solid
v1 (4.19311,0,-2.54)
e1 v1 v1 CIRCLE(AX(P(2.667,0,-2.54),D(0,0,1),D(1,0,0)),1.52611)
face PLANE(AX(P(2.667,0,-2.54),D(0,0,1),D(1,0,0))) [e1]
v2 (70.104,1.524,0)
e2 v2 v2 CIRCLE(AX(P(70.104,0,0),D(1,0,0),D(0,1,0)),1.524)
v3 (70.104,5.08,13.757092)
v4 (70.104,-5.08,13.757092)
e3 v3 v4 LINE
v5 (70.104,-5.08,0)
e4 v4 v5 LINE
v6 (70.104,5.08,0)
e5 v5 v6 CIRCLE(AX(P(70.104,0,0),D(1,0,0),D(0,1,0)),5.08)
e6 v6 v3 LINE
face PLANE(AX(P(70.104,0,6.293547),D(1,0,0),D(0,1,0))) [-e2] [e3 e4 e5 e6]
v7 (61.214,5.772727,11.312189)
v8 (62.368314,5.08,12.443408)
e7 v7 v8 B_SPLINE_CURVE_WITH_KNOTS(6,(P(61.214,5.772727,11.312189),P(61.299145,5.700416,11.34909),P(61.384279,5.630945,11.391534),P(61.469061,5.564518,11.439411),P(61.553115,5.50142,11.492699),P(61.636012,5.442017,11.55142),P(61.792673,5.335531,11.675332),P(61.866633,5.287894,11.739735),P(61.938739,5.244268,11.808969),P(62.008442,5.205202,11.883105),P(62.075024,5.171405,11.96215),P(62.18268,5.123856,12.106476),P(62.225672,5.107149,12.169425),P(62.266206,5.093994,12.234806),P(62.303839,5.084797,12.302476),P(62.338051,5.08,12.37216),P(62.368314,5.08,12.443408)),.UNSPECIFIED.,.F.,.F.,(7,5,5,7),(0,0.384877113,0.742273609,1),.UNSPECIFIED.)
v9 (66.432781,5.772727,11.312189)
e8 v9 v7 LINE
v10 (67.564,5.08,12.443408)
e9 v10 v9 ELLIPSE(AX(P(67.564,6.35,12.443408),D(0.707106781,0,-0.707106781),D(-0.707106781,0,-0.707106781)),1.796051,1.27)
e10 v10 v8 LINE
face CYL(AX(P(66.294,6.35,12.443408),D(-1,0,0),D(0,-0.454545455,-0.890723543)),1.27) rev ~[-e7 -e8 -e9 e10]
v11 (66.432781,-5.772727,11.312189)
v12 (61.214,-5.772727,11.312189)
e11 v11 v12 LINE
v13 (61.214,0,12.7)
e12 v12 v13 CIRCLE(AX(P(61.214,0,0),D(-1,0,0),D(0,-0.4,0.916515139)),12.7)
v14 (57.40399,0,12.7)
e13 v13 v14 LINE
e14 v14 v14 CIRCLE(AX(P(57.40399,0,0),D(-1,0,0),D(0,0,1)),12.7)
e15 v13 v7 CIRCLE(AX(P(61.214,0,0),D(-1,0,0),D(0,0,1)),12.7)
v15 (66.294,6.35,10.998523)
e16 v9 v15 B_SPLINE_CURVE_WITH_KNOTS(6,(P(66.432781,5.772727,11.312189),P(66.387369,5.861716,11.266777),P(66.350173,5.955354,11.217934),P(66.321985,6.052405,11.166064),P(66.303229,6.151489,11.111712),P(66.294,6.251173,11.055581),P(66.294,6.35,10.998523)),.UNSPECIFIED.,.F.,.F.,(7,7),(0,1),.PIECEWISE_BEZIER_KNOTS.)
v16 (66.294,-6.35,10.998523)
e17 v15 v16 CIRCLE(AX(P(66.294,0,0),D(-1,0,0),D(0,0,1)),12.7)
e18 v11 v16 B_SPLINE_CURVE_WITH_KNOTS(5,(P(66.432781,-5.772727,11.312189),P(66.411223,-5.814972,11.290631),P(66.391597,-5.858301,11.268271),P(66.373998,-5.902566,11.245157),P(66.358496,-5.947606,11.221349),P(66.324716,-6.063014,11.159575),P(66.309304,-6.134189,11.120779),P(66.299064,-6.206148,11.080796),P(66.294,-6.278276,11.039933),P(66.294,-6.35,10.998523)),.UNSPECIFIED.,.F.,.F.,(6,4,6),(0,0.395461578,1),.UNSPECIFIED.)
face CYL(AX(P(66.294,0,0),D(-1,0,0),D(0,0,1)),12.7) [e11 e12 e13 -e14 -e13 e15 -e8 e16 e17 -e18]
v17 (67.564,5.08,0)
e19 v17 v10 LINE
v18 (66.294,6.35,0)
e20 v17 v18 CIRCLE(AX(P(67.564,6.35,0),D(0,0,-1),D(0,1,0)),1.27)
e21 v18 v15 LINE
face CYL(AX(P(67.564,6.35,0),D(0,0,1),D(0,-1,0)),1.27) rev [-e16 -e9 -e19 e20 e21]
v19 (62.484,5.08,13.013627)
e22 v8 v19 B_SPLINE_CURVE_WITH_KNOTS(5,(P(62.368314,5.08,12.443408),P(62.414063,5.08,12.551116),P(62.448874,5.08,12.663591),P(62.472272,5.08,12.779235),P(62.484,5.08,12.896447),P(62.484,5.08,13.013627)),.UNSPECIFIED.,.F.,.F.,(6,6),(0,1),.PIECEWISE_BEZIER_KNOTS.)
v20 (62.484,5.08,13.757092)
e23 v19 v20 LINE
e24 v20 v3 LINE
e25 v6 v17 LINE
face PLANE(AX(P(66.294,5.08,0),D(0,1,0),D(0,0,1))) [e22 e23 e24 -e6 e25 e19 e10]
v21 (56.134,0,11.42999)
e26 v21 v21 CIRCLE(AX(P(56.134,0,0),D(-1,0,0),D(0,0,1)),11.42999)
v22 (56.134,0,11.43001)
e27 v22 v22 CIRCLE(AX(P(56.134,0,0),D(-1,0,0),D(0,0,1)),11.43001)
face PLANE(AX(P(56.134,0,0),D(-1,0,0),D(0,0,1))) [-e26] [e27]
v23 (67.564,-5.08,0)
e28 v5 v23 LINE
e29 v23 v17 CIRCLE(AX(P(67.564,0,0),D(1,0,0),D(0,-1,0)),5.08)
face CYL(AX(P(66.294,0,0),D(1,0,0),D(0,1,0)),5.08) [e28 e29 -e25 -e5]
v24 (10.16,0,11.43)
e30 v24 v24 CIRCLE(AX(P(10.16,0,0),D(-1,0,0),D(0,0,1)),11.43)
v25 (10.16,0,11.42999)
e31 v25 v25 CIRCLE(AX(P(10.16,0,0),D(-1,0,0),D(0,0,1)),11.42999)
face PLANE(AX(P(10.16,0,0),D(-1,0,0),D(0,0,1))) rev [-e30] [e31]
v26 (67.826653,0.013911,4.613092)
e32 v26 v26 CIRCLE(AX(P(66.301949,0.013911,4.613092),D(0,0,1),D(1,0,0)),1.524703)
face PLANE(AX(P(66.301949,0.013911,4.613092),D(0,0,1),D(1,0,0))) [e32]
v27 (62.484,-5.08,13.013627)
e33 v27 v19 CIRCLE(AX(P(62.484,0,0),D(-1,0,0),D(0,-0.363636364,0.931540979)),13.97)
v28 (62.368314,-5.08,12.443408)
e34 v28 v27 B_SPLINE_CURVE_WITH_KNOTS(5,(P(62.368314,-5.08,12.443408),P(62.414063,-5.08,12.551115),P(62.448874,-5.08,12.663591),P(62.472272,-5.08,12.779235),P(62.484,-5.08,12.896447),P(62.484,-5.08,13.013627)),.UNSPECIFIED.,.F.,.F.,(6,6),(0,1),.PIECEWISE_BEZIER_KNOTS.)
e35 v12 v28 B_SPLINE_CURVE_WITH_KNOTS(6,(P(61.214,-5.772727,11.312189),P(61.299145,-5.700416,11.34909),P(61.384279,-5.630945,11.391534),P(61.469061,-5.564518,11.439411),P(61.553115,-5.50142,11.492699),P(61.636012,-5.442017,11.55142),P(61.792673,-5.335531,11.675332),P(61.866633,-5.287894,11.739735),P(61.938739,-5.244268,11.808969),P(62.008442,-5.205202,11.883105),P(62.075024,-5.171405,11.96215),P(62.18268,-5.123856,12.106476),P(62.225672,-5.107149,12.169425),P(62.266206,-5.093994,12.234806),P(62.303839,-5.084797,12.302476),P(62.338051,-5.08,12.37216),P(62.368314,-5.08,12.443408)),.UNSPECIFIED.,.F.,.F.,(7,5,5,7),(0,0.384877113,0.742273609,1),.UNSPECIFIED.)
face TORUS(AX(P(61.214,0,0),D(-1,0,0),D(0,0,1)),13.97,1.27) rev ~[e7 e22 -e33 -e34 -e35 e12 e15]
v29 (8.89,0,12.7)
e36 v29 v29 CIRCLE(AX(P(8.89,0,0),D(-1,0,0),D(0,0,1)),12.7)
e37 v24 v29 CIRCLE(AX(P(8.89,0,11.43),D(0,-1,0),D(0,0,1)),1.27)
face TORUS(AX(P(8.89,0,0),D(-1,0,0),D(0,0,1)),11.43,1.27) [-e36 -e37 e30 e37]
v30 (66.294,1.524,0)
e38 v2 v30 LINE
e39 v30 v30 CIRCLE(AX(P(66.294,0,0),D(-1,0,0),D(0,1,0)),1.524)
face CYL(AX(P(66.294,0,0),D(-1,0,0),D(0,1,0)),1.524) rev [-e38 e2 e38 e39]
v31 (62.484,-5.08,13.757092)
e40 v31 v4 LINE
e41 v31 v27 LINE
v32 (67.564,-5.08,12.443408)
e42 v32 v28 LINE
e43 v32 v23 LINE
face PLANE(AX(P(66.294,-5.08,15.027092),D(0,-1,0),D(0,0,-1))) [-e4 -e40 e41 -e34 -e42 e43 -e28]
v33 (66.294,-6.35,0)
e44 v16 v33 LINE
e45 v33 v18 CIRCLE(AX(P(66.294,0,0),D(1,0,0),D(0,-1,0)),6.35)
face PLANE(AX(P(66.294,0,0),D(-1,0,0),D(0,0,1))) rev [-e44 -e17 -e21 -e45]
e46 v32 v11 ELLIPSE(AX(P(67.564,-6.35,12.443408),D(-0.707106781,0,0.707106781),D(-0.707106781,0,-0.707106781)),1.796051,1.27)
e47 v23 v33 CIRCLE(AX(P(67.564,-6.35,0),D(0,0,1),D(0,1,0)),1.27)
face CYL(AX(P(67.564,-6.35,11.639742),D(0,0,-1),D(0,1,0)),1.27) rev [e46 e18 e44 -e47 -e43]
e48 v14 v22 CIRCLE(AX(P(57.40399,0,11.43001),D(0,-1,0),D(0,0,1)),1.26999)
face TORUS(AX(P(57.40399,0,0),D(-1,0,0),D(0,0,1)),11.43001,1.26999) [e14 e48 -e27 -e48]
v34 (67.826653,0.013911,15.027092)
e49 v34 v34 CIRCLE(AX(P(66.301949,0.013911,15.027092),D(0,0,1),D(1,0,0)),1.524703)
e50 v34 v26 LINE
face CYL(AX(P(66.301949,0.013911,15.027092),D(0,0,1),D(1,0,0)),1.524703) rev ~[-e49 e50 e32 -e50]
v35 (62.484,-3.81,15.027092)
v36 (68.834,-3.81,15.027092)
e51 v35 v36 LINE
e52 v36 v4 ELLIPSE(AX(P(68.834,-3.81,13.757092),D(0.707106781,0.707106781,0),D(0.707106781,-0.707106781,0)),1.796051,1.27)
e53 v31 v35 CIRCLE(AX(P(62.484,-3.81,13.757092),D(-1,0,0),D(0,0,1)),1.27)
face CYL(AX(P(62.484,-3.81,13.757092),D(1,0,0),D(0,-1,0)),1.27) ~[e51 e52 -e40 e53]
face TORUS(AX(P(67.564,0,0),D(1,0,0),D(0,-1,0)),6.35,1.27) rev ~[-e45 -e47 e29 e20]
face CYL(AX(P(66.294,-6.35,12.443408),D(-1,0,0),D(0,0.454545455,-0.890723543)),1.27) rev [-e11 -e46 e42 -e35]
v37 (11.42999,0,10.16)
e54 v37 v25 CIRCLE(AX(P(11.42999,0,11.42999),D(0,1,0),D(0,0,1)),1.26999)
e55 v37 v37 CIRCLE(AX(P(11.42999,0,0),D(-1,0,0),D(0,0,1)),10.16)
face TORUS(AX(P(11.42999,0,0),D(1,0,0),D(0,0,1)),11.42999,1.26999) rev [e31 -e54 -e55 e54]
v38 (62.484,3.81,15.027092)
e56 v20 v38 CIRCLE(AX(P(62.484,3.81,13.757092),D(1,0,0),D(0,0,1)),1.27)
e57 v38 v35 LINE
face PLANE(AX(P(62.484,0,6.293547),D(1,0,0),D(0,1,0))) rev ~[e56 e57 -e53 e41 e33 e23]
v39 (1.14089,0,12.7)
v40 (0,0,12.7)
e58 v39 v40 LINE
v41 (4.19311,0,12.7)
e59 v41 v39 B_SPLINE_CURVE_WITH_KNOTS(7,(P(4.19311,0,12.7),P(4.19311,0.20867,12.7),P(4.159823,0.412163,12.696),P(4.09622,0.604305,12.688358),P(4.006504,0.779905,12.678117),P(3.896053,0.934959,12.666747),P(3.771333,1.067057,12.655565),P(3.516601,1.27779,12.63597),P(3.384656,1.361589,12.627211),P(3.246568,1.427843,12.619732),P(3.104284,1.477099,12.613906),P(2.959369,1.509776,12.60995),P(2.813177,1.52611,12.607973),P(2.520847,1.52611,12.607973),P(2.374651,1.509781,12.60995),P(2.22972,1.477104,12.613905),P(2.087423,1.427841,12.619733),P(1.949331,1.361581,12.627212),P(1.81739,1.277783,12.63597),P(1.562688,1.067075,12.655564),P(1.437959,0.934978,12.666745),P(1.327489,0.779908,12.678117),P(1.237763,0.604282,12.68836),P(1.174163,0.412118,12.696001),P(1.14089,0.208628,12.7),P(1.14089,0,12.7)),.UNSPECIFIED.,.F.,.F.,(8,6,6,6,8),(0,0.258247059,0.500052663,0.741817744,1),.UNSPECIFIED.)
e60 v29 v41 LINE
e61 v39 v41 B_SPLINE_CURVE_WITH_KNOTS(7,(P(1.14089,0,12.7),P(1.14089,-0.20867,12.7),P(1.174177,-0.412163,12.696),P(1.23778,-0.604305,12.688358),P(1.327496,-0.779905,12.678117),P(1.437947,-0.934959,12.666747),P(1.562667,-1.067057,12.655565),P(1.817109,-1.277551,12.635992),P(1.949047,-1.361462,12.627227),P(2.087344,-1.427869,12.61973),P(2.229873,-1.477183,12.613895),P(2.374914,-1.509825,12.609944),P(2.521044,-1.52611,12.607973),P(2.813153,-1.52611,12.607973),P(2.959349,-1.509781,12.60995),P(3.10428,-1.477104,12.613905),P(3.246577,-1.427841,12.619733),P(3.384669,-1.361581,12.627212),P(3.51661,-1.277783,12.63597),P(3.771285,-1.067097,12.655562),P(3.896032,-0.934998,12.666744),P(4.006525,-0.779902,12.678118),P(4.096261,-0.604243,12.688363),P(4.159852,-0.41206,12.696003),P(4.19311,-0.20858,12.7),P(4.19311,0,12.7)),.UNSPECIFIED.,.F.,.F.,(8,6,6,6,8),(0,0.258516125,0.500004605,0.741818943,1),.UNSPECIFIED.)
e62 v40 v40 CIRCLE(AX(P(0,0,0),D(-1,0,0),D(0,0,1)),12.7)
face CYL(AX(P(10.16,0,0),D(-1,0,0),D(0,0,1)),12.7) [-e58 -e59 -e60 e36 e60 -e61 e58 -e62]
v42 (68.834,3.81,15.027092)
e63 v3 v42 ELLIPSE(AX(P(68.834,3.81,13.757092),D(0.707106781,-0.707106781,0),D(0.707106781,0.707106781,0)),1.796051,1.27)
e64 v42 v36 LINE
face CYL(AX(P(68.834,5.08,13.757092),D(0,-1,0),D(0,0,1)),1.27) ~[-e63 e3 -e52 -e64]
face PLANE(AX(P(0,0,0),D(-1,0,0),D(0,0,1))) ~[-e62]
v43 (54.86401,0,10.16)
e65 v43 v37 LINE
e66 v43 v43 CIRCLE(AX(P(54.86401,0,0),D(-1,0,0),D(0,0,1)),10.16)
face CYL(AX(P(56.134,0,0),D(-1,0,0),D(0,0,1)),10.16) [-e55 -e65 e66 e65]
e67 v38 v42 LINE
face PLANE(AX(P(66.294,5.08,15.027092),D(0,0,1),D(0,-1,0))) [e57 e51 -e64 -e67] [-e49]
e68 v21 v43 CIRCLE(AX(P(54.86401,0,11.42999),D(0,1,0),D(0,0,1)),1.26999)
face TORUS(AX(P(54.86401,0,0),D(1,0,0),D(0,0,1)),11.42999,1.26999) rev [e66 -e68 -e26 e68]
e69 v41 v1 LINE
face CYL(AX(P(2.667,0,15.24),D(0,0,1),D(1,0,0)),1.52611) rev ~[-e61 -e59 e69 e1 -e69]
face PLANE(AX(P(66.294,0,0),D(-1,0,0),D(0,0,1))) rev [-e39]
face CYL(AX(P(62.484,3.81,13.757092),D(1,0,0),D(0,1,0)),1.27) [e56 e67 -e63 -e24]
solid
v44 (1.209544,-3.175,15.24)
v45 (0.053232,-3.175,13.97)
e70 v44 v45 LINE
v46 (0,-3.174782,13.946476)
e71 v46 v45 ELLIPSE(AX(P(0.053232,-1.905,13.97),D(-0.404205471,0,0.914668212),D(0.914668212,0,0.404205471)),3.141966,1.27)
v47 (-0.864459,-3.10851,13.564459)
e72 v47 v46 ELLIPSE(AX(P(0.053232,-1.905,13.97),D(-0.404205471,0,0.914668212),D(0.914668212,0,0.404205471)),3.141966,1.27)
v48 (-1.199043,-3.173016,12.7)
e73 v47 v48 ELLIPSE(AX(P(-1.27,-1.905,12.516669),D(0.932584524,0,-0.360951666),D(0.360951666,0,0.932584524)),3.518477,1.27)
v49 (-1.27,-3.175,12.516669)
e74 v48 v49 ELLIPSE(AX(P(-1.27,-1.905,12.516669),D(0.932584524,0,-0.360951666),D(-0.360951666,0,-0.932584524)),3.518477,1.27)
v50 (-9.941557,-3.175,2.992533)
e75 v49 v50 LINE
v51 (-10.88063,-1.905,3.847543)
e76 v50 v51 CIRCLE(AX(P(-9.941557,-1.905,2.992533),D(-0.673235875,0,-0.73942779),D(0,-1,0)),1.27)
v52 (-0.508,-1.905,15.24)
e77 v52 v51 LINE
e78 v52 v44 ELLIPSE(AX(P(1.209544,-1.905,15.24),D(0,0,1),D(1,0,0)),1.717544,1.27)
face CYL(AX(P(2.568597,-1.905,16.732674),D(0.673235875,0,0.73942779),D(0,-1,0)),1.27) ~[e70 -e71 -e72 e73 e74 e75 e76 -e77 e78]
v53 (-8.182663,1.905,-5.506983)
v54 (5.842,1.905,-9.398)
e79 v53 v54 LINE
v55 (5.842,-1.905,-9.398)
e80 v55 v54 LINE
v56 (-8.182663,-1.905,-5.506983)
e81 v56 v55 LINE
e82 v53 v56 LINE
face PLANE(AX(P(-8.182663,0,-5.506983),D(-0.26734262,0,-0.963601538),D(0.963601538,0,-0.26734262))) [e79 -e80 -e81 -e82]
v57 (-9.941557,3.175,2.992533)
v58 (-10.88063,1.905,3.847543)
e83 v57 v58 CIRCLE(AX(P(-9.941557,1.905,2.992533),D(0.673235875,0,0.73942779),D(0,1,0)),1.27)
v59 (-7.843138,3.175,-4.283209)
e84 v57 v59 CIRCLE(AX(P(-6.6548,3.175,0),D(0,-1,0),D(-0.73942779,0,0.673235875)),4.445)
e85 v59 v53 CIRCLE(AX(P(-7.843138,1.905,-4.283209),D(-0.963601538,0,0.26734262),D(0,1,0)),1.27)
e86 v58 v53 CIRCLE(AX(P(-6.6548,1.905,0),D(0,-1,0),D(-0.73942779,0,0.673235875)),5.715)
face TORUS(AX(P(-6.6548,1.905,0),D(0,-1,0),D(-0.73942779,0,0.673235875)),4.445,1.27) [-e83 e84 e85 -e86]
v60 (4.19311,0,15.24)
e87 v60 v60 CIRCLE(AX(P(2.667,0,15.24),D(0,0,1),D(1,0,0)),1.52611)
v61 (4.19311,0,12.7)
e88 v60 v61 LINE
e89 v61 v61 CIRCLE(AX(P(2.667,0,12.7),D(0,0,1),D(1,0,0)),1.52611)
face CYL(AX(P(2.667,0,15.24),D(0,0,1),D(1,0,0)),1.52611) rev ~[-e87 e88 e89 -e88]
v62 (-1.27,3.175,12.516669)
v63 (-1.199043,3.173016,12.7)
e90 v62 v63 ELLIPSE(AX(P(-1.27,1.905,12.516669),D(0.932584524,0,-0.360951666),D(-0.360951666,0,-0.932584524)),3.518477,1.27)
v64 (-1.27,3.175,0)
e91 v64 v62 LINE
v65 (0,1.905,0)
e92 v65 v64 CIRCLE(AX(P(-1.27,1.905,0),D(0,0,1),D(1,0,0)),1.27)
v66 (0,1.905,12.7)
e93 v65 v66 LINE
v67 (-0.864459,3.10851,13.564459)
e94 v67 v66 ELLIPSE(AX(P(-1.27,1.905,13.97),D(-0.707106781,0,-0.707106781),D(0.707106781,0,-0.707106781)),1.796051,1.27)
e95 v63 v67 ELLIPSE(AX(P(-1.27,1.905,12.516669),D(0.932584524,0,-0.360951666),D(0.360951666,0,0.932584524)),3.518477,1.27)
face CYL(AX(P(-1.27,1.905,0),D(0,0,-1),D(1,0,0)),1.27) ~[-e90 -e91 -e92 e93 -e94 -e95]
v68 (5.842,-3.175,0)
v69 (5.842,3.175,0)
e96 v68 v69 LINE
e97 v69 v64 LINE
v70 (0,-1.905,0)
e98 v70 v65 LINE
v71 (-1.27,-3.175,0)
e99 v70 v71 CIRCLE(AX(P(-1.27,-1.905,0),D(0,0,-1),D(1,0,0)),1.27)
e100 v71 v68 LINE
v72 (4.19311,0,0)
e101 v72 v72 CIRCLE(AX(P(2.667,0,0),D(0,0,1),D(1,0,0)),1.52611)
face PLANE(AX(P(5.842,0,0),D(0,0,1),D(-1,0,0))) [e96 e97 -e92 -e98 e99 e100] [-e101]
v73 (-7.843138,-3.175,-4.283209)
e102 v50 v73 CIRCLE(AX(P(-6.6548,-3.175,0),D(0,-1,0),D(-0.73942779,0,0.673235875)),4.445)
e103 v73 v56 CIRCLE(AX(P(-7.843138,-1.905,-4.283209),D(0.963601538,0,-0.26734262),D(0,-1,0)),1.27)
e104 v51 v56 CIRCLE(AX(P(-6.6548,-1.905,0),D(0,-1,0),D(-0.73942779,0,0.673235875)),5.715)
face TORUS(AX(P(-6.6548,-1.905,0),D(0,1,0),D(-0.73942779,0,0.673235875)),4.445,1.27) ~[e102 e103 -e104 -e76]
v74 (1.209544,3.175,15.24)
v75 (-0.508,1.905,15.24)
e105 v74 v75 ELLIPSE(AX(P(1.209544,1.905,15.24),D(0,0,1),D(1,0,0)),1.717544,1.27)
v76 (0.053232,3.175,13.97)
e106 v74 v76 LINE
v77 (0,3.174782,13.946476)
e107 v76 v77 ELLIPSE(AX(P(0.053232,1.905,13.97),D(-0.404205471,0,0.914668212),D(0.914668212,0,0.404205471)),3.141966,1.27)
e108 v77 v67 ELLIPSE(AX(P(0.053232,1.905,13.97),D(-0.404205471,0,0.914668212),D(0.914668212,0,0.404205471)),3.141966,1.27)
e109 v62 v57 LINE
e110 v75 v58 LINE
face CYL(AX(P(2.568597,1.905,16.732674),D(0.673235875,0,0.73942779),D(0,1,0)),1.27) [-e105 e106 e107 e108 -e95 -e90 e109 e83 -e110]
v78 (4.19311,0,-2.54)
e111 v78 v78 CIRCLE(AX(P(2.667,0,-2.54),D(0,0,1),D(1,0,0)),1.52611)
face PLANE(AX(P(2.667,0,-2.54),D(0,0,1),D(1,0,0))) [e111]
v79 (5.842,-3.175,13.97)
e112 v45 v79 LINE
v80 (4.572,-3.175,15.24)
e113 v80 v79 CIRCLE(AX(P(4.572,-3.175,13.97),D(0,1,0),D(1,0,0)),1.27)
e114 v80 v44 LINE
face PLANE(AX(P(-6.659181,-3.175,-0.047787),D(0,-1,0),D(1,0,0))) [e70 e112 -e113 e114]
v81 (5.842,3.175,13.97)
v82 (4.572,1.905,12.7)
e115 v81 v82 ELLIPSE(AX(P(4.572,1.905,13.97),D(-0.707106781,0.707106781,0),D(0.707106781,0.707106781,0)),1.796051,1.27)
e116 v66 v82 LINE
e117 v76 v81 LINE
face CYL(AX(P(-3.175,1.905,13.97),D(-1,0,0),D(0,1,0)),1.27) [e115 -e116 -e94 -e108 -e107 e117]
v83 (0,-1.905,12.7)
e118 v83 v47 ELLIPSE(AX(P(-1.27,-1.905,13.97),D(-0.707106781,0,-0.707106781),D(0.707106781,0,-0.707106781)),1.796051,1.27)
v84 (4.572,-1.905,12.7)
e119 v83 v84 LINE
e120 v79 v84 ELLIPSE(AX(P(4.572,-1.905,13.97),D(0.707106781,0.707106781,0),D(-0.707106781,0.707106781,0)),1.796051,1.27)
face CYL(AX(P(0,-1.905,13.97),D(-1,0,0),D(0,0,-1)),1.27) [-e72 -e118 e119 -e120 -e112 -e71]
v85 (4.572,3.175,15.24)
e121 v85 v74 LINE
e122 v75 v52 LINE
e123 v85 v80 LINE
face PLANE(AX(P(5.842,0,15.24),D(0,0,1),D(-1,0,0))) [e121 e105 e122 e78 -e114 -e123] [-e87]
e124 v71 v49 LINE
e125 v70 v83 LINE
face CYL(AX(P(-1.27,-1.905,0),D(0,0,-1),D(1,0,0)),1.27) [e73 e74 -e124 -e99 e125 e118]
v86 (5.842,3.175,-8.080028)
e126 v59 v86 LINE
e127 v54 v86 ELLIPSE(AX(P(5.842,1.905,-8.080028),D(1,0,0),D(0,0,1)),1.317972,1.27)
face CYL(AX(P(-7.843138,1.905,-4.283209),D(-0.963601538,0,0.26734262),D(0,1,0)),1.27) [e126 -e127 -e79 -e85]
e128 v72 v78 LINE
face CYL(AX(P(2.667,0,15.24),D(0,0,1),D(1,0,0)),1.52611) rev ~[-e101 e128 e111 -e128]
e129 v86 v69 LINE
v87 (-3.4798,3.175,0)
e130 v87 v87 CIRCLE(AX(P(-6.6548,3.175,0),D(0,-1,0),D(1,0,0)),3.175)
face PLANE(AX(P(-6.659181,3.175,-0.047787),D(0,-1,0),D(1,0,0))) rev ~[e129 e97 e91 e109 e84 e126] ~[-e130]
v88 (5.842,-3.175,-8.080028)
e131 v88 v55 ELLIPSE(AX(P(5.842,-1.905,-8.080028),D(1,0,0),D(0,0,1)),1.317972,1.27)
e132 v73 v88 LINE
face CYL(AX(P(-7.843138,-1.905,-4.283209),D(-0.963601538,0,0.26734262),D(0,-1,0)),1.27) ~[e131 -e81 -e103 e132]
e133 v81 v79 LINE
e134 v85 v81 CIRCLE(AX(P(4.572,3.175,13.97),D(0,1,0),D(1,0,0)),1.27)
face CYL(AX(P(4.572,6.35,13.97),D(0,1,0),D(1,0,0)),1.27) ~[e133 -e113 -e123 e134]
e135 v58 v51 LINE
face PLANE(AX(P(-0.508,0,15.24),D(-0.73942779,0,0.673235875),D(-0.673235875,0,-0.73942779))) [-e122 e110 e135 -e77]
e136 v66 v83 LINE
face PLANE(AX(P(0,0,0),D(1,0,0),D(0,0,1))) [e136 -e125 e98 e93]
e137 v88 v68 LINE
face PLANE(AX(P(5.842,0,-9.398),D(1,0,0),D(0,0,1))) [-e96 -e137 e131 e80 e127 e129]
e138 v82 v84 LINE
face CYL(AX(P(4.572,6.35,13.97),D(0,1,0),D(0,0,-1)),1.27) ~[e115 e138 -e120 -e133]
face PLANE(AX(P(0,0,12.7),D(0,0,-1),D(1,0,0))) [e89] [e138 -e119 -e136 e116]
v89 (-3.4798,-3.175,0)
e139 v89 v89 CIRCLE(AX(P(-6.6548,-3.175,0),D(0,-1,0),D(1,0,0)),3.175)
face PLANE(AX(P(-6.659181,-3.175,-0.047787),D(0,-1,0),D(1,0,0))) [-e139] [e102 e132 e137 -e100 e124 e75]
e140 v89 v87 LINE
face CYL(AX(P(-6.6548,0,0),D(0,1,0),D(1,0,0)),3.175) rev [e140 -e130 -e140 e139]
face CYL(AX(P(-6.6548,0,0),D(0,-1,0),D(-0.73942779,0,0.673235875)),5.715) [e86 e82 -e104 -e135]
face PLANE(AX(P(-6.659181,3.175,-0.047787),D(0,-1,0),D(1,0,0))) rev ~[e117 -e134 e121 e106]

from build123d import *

# Parameters (mm, degrees)
F0_R          = 3.175
F1_DEPTH      = 3.175
F0_W          = 5.842
F0_H          = 12.7
F3_R          = 1.524
F4_DEPTH      = 3.81
F5_R          = 1.5247034047
F6_DEPTH      = 10.414
F7_R          = 1.5261104457
F8_DEPTH      = 17.78
F9_R          = 1.26999
F10_R         = 1.27
F11_T1_DEPTH  = 12.7
F11_T3_DEPTH  = 18.5821257943
F11_T5_DEPTH  = 12.7
F11_T7_DEPTH  = 9.017
F11_T9_DEPTH  = 17.7294216388
F11_T12_ANGLE = 116.8111069241
F11_T14_ANGLE = 116.8111069241
F11_T19_DEPTH = 15.875
F11_T23_DEPTH = 12.192
F11_T30_DEPTH = 15.875
F11_T34_DEPTH = 12.192
F12_R         = 1.27


# Not quite as in the source:
# - a fillet or chamfer that OpenCascade refuses, or shapes differently, is made with other operations: its cross-section is extruded or revolved along the edge and cut away or added
# - a fillet or chamfer is up to 0.001 mm smaller than in the source, because OpenCascade refuses the exact size


with BuildPart() as f1:
    # F0 (on Front) → F1 (new body, symmetric)
    with BuildSketch(Plane.XZ):
        with BuildLine():
            ThreePointArc((-8.1826630726, -5.5069827884), (-3.1957909266, -4.5493385486), (-0.9398, 0))
            ThreePointArc((-0.9398, 0), (-4.5919612295, 5.3297205562), (-10.8806298187, 3.8475430269))
            ThreePointArc((-10.8806298187, 3.8475430269), (-12.1459778134, -1.5837270034), (-8.1826630726, -5.5069827884))
        make_face()
        with Locations((-6.6548, 0)):
            Circle(F0_R, mode=Mode.SUBTRACT)
        with BuildLine():
            Line((-0.9398, 0), (0, 0))
            Line((0, 0), (0, 12.7))
            Line((0, 12.7), (5.842, 12.7))
            Line((5.842, 12.7), (5.842, 15.24))
            Line((5.842, 15.24), (-0.508, 15.24))
            Line((-0.508, 15.24), (-10.8806298187, 3.8475430269))
            ThreePointArc((-10.8806298187, 3.8475430269), (-4.5919612295, 5.3297205562), (-0.9398, 0))
        make_face()
        with BuildLine():
            Line((5.842, 0), (0, 0))
            Line((0, 0), (-0.9398, 0))
            ThreePointArc((-0.9398, 0), (-3.1957909266, -4.5493385486), (-8.1826630726, -5.5069827884))
            Line((-8.1826630726, -5.5069827884), (5.842, -9.398))
            Line((5.842, -9.398), (5.842, 0))
        make_face()
    extrude(amount=F1_DEPTH, both=True)


with BuildPart() as f2:
    # F0 (on Front) → F2 (revolve)
    with BuildSketch(Plane.XZ):
        with Locations((2.921, 6.35)):
            Rectangle(F0_W, F0_H)
        Polygon((5.842, 12.7), (5.842, 0), (66.294, 0), (66.294, 12.7), (56.134, 12.7), (56.134, 10.16), (10.16, 10.16), (10.16, 12.7), align=None)
    revolve(axis=Axis((33.147, 0, 0), (-1, 0, 0)))

    # F3 (on face) → F4 (join, symmetric)
    with BuildSketch(Plane.YZ.offset(66.294)):
        with BuildLine():
            ThreePointArc((-5.08, 0), (0, 5.08), (5.08, 0))
            Line((5.08, 0), (5.08, 11.6397422652))
            ThreePointArc((5.08, 11.6397422652), (0, 12.7), (-5.08, 11.6397422652))
            Line((-5.08, 11.6397422652), (-5.08, 0))
        make_face()
        with BuildLine():
            ThreePointArc((-5.08, 0), (0, -5.08), (5.08, 0))
            ThreePointArc((5.08, 0), (0, 5.08), (-5.08, 0))
        make_face()
        Circle(F3_R, mode=Mode.SUBTRACT)
        with BuildLine():
            ThreePointArc((-5.08, 11.6397422652), (0, 12.7), (5.08, 11.6397422652))
            Line((5.08, 11.6397422652), (5.08, 15.0270918384))
            Line((5.08, 15.0270918384), (-5.08, 15.0270918384))
            Line((-5.08, 15.0270918384), (-5.08, 11.6397422652))
        make_face()
    extrude(amount=F4_DEPTH, both=True)

    # F5 (on face) → F6 (cut)
    with BuildSketch(Plane.XY.offset(15.0270918384)):
        with Locations((66.3019493222, 0.0139107933)):
            Circle(F5_R)
    extrude(amount=-F6_DEPTH, mode=Mode.SUBTRACT)


with BuildPart() as f8_tool:
    # F7 (on face) → F8 (new body)
    with BuildSketch(Plane.XY.offset(15.24)):
        with Locations((2.667, 0)):
            Circle(F7_R)
    extrude(amount=-F8_DEPTH)


with BuildPart() as f1_1:
    add(f1.part)

    # F8: cut by f8_tool
    add(f8_tool.part, mode=Mode.SUBTRACT)

    # F11: fillet of radius 1.27 on 12 edges, made by hand

    # F11_s2 → F11_t1 (cut)
    with BuildSketch(Plane.XY):
        with BuildLine():
            ThreePointArc((0, -1.905), (-0.3719743879, -2.8030256121), (-1.27, -3.175))
            Line((-1.27, -3.175), (0, -3.175))
            Line((0, -3.175), (0, -1.905))
        make_face()
        with BuildLine():
            ThreePointArc((0, 1.905), (-0.3719743879, 2.8030256121), (-1.27, 3.175))
            Line((-1.27, 3.175), (0, 3.175))
            Line((0, 3.175), (0, 1.905))
        make_face()
    extrude(amount=F11_T1_DEPTH, mode=Mode.SUBTRACT)

    # F11_s4 → F11_t3 (cut)
    with BuildSketch(Plane(origin=(9.4938886236, 0, 10.4273187748), x_dir=(0, 1, 0), z_dir=(-0.6732358752, 0, -0.7394277898))):
        with BuildLine():
            ThreePointArc((-3.175, -9.3657440555), (-2.8030256121, -10.2637696676), (-1.905, -10.6357440555))
            Line((-1.905, -10.6357440555), (-3.175, -10.6357440555))
            Line((-3.175, -10.6357440555), (-3.175, -9.3657440555))
        make_face()
        with BuildLine():
            ThreePointArc((3.175, -9.3657440555), (2.8030256121, -10.2637696676), (1.905, -10.6357440555))
            Line((1.905, -10.6357440555), (3.175, -10.6357440555))
            Line((3.175, -10.6357440555), (3.175, -9.3657440555))
        make_face()
    extrude(amount=F11_T3_DEPTH, mode=Mode.SUBTRACT)

    # F11_s6 → F11_t5 (cut)
    with BuildSketch(Plane.XZ.offset(-6.35)):
        with BuildLine():
            ThreePointArc((5.842, 13.97), (5.4700256121, 14.8680256121), (4.572, 15.24))
            Line((4.572, 15.24), (5.842, 15.24))
            Line((5.842, 15.24), (5.842, 13.97))
        make_face()
        with BuildLine():
            ThreePointArc((4.572, 12.7), (5.4700256121, 13.0719743879), (5.842, 13.97))
            Line((5.842, 13.97), (5.842, 12.7))
            Line((5.842, 12.7), (4.572, 12.7))
        make_face()
    extrude(amount=F11_T5_DEPTH, mode=Mode.SUBTRACT)

    # F11_s8 → F11_t7 (cut)
    with BuildSketch(Plane.YZ):
        with BuildLine():
            ThreePointArc((-1.905, 12.7), (-2.8030256121, 13.0719743879), (-3.175, 13.97))
            Line((-3.175, 13.97), (-3.175, 12.7))
            Line((-3.175, 12.7), (-1.905, 12.7))
        make_face()
        with BuildLine():
            ThreePointArc((3.175, 13.97), (2.8030256121, 13.0719743879), (1.905, 12.7))
            Line((1.905, 12.7), (3.175, 12.7))
            Line((3.175, 12.7), (3.175, 13.97))
        make_face()
    extrude(amount=F11_T7_DEPTH, mode=Mode.SUBTRACT)

    # F11_s10 → F11_t9 (cut)
    with BuildSketch(Plane(origin=(-6.179167626, 0, 1.7143547379), x_dir=(0, 1, 0), z_dir=(0.9636015378, 0, -0.2673426199))):
        with BuildLine():
            ThreePointArc((-3.175, -6.2241116667), (-2.8030256121, -7.1221372788), (-1.905, -7.4941116667))
            Line((-1.905, -7.4941116667), (-3.175, -7.4941116667))
            Line((-3.175, -7.4941116667), (-3.175, -6.2241116667))
        make_face()
        with BuildLine():
            ThreePointArc((3.175, -6.2241116667), (2.8030256121, -7.1221372788), (1.905, -7.4941116667))
            Line((1.905, -7.4941116667), (3.175, -7.4941116667))
            Line((3.175, -7.4941116667), (3.175, -6.2241116667))
        make_face()
    extrude(amount=F11_T9_DEPTH, mode=Mode.SUBTRACT)

    # F11_s11 → F11_t12 (revolve, cut)
    with BuildSketch(Plane(origin=(-3.0162650989, 0, -3.3128214309), x_dir=(0, 1, 0), z_dir=(0.6732358752, 0, 0.7394277898))):
        with BuildLine():
            ThreePointArc((-3.175, 9.3657440555), (-2.8030256121, 10.2637696676), (-1.905, 10.6357440555))
            Line((-1.905, 10.6357440555), (-3.175, 10.6357440555))
            Line((-3.175, 10.6357440555), (-3.175, 9.3657440555))
        make_face()
    revolve(axis=Axis((-6.6548, -3.175, 0), (0, -1, 0)), revolution_arc=F11_T12_ANGLE, mode=Mode.SUBTRACT)

    # F11_s13 → F11_t14 (revolve, cut)
    with BuildSketch(Plane(origin=(-3.0162650989, 0, -3.3128214309), x_dir=(0, 1, 0), z_dir=(0.6732358752, 0, 0.7394277898))):
        with BuildLine():
            ThreePointArc((3.175, 9.3657440555), (2.8030256121, 10.2637696676), (1.905, 10.6357440555))
            Line((1.905, 10.6357440555), (3.175, 10.6357440555))
            Line((3.175, 10.6357440555), (3.175, 9.3657440555))
        make_face()
    revolve(axis=Axis((-6.6548, 3.175, 0), (0, -1, 0)), revolution_arc=F11_T14_ANGLE, mode=Mode.SUBTRACT)


with BuildPart() as f2_1:
    add(f2.part)

    # F8: cut by f8_tool
    add(f8_tool.part, mode=Mode.SUBTRACT)

    # F9 (radius 1.27 in the source; OpenCascade refuses exactly that, so slightly less here)
    f9_edges = [f2_1.edges().sort_by_distance(p)[0] for p in [
        (56.134, 0, -12.7),
        (56.134, 0, -10.16),
        (10.16, 0, -10.16),
        (33.147, 0, 10.16),
    ]]
    fillet(f9_edges, radius=F9_R)

    # F10
    f10_edges = [f2_1.edges().sort_by_distance(p)[0] for p in [
        (10.16, 0, -11.42999),
        (10.16, 0, -12.7),
        (10.531971, 0, 10.531971),
        (11.42999, 0, -10.16),
    ]]
    fillet(f10_edges, radius=F10_R)

    # F12
    f12_edges = [f2_1.edges().sort_by_distance(p)[0] for p in [
        (66.294, 5.08, 5.819871),
        (66.294, -5.08, 5.819871),
        (66.294, 0, -5.08),
        (62.484, 2.594732, 12.43211),
        (62.484, -2.594732, 12.43211),
        (64.389, 5.08, 11.639742),
        (64.389, -5.08, 11.639742),
        (66.294, 5.08, 15.027092),
        (70.104, 0, 15.027092),
        (66.294, -5.08, 15.027092),
    ]]
    fillet(f12_edges, radius=F12_R)


with BuildPart() as f11_tool17:
    # F11_s18 → F11_t19 (new body)
    with BuildSketch(Plane.XY):
        with BuildLine():
            ThreePointArc((0, -1.905), (-0.3719743879, -2.8030256121), (-1.27, -3.175))
            Line((-1.27, -3.175), (0, -3.175))
            Line((0, -3.175), (0, -1.905))
        make_face()
    extrude(amount=F11_T19_DEPTH)

    split(bisect_by=Plane.XY.offset(12.7), keep=Keep.TOP)


with BuildPart() as f11_tool21:
    # F11_s22 → F11_t23 (new body)
    with BuildSketch(Plane.YZ.offset(-3.175)):
        with BuildLine():
            ThreePointArc((-1.905, 12.7), (-2.8030256121, 13.0719743879), (-3.175, 13.97))
            Line((-3.175, 13.97), (-3.175, 12.7))
            Line((-3.175, 12.7), (-1.905, 12.7))
        make_face()
    extrude(amount=F11_T23_DEPTH)

    split(bisect_by=Plane.YZ, keep=Keep.BOTTOM)


with BuildPart() as f11_tool17_1:
    add(f11_tool17.part)

    # F11_t25: intersect F11_tool21
    add(f11_tool21.part, mode=Mode.INTERSECT)


with BuildPart() as f1_2:
    add(f1_1.part)

    # F11_t15: cut F11_tool17
    add(f11_tool17_1.part, mode=Mode.SUBTRACT)


with BuildPart() as f11_tool28:
    # F11_s29 → F11_t30 (new body)
    with BuildSketch(Plane.XY):
        with BuildLine():
            ThreePointArc((0, 1.905), (-0.3719743879, 2.8030256121), (-1.27, 3.175))
            Line((-1.27, 3.175), (0, 3.175))
            Line((0, 3.175), (0, 1.905))
        make_face()
    extrude(amount=F11_T30_DEPTH)

    split(bisect_by=Plane.XY.offset(12.7), keep=Keep.TOP)


with BuildPart() as f11_tool32:
    # F11_s33 → F11_t34 (new body)
    with BuildSketch(Plane.YZ.offset(-3.175)):
        with BuildLine():
            ThreePointArc((3.175, 13.97), (2.8030256121, 13.0719743879), (1.905, 12.7))
            Line((1.905, 12.7), (3.175, 12.7))
            Line((3.175, 12.7), (3.175, 13.97))
        make_face()
    extrude(amount=F11_T34_DEPTH)

    split(bisect_by=Plane.YZ, keep=Keep.BOTTOM)


with BuildPart() as f11_tool28_1:
    add(f11_tool28.part)

    # F11_t36: intersect F11_tool32
    add(f11_tool32.part, mode=Mode.INTERSECT)


with BuildPart() as f1_3:
    add(f1_2.part)

    # F11_t26: cut F11_tool28
    add(f11_tool28_1.part, mode=Mode.SUBTRACT)


solid = Compound([f2_1.part, f1_3.part])
